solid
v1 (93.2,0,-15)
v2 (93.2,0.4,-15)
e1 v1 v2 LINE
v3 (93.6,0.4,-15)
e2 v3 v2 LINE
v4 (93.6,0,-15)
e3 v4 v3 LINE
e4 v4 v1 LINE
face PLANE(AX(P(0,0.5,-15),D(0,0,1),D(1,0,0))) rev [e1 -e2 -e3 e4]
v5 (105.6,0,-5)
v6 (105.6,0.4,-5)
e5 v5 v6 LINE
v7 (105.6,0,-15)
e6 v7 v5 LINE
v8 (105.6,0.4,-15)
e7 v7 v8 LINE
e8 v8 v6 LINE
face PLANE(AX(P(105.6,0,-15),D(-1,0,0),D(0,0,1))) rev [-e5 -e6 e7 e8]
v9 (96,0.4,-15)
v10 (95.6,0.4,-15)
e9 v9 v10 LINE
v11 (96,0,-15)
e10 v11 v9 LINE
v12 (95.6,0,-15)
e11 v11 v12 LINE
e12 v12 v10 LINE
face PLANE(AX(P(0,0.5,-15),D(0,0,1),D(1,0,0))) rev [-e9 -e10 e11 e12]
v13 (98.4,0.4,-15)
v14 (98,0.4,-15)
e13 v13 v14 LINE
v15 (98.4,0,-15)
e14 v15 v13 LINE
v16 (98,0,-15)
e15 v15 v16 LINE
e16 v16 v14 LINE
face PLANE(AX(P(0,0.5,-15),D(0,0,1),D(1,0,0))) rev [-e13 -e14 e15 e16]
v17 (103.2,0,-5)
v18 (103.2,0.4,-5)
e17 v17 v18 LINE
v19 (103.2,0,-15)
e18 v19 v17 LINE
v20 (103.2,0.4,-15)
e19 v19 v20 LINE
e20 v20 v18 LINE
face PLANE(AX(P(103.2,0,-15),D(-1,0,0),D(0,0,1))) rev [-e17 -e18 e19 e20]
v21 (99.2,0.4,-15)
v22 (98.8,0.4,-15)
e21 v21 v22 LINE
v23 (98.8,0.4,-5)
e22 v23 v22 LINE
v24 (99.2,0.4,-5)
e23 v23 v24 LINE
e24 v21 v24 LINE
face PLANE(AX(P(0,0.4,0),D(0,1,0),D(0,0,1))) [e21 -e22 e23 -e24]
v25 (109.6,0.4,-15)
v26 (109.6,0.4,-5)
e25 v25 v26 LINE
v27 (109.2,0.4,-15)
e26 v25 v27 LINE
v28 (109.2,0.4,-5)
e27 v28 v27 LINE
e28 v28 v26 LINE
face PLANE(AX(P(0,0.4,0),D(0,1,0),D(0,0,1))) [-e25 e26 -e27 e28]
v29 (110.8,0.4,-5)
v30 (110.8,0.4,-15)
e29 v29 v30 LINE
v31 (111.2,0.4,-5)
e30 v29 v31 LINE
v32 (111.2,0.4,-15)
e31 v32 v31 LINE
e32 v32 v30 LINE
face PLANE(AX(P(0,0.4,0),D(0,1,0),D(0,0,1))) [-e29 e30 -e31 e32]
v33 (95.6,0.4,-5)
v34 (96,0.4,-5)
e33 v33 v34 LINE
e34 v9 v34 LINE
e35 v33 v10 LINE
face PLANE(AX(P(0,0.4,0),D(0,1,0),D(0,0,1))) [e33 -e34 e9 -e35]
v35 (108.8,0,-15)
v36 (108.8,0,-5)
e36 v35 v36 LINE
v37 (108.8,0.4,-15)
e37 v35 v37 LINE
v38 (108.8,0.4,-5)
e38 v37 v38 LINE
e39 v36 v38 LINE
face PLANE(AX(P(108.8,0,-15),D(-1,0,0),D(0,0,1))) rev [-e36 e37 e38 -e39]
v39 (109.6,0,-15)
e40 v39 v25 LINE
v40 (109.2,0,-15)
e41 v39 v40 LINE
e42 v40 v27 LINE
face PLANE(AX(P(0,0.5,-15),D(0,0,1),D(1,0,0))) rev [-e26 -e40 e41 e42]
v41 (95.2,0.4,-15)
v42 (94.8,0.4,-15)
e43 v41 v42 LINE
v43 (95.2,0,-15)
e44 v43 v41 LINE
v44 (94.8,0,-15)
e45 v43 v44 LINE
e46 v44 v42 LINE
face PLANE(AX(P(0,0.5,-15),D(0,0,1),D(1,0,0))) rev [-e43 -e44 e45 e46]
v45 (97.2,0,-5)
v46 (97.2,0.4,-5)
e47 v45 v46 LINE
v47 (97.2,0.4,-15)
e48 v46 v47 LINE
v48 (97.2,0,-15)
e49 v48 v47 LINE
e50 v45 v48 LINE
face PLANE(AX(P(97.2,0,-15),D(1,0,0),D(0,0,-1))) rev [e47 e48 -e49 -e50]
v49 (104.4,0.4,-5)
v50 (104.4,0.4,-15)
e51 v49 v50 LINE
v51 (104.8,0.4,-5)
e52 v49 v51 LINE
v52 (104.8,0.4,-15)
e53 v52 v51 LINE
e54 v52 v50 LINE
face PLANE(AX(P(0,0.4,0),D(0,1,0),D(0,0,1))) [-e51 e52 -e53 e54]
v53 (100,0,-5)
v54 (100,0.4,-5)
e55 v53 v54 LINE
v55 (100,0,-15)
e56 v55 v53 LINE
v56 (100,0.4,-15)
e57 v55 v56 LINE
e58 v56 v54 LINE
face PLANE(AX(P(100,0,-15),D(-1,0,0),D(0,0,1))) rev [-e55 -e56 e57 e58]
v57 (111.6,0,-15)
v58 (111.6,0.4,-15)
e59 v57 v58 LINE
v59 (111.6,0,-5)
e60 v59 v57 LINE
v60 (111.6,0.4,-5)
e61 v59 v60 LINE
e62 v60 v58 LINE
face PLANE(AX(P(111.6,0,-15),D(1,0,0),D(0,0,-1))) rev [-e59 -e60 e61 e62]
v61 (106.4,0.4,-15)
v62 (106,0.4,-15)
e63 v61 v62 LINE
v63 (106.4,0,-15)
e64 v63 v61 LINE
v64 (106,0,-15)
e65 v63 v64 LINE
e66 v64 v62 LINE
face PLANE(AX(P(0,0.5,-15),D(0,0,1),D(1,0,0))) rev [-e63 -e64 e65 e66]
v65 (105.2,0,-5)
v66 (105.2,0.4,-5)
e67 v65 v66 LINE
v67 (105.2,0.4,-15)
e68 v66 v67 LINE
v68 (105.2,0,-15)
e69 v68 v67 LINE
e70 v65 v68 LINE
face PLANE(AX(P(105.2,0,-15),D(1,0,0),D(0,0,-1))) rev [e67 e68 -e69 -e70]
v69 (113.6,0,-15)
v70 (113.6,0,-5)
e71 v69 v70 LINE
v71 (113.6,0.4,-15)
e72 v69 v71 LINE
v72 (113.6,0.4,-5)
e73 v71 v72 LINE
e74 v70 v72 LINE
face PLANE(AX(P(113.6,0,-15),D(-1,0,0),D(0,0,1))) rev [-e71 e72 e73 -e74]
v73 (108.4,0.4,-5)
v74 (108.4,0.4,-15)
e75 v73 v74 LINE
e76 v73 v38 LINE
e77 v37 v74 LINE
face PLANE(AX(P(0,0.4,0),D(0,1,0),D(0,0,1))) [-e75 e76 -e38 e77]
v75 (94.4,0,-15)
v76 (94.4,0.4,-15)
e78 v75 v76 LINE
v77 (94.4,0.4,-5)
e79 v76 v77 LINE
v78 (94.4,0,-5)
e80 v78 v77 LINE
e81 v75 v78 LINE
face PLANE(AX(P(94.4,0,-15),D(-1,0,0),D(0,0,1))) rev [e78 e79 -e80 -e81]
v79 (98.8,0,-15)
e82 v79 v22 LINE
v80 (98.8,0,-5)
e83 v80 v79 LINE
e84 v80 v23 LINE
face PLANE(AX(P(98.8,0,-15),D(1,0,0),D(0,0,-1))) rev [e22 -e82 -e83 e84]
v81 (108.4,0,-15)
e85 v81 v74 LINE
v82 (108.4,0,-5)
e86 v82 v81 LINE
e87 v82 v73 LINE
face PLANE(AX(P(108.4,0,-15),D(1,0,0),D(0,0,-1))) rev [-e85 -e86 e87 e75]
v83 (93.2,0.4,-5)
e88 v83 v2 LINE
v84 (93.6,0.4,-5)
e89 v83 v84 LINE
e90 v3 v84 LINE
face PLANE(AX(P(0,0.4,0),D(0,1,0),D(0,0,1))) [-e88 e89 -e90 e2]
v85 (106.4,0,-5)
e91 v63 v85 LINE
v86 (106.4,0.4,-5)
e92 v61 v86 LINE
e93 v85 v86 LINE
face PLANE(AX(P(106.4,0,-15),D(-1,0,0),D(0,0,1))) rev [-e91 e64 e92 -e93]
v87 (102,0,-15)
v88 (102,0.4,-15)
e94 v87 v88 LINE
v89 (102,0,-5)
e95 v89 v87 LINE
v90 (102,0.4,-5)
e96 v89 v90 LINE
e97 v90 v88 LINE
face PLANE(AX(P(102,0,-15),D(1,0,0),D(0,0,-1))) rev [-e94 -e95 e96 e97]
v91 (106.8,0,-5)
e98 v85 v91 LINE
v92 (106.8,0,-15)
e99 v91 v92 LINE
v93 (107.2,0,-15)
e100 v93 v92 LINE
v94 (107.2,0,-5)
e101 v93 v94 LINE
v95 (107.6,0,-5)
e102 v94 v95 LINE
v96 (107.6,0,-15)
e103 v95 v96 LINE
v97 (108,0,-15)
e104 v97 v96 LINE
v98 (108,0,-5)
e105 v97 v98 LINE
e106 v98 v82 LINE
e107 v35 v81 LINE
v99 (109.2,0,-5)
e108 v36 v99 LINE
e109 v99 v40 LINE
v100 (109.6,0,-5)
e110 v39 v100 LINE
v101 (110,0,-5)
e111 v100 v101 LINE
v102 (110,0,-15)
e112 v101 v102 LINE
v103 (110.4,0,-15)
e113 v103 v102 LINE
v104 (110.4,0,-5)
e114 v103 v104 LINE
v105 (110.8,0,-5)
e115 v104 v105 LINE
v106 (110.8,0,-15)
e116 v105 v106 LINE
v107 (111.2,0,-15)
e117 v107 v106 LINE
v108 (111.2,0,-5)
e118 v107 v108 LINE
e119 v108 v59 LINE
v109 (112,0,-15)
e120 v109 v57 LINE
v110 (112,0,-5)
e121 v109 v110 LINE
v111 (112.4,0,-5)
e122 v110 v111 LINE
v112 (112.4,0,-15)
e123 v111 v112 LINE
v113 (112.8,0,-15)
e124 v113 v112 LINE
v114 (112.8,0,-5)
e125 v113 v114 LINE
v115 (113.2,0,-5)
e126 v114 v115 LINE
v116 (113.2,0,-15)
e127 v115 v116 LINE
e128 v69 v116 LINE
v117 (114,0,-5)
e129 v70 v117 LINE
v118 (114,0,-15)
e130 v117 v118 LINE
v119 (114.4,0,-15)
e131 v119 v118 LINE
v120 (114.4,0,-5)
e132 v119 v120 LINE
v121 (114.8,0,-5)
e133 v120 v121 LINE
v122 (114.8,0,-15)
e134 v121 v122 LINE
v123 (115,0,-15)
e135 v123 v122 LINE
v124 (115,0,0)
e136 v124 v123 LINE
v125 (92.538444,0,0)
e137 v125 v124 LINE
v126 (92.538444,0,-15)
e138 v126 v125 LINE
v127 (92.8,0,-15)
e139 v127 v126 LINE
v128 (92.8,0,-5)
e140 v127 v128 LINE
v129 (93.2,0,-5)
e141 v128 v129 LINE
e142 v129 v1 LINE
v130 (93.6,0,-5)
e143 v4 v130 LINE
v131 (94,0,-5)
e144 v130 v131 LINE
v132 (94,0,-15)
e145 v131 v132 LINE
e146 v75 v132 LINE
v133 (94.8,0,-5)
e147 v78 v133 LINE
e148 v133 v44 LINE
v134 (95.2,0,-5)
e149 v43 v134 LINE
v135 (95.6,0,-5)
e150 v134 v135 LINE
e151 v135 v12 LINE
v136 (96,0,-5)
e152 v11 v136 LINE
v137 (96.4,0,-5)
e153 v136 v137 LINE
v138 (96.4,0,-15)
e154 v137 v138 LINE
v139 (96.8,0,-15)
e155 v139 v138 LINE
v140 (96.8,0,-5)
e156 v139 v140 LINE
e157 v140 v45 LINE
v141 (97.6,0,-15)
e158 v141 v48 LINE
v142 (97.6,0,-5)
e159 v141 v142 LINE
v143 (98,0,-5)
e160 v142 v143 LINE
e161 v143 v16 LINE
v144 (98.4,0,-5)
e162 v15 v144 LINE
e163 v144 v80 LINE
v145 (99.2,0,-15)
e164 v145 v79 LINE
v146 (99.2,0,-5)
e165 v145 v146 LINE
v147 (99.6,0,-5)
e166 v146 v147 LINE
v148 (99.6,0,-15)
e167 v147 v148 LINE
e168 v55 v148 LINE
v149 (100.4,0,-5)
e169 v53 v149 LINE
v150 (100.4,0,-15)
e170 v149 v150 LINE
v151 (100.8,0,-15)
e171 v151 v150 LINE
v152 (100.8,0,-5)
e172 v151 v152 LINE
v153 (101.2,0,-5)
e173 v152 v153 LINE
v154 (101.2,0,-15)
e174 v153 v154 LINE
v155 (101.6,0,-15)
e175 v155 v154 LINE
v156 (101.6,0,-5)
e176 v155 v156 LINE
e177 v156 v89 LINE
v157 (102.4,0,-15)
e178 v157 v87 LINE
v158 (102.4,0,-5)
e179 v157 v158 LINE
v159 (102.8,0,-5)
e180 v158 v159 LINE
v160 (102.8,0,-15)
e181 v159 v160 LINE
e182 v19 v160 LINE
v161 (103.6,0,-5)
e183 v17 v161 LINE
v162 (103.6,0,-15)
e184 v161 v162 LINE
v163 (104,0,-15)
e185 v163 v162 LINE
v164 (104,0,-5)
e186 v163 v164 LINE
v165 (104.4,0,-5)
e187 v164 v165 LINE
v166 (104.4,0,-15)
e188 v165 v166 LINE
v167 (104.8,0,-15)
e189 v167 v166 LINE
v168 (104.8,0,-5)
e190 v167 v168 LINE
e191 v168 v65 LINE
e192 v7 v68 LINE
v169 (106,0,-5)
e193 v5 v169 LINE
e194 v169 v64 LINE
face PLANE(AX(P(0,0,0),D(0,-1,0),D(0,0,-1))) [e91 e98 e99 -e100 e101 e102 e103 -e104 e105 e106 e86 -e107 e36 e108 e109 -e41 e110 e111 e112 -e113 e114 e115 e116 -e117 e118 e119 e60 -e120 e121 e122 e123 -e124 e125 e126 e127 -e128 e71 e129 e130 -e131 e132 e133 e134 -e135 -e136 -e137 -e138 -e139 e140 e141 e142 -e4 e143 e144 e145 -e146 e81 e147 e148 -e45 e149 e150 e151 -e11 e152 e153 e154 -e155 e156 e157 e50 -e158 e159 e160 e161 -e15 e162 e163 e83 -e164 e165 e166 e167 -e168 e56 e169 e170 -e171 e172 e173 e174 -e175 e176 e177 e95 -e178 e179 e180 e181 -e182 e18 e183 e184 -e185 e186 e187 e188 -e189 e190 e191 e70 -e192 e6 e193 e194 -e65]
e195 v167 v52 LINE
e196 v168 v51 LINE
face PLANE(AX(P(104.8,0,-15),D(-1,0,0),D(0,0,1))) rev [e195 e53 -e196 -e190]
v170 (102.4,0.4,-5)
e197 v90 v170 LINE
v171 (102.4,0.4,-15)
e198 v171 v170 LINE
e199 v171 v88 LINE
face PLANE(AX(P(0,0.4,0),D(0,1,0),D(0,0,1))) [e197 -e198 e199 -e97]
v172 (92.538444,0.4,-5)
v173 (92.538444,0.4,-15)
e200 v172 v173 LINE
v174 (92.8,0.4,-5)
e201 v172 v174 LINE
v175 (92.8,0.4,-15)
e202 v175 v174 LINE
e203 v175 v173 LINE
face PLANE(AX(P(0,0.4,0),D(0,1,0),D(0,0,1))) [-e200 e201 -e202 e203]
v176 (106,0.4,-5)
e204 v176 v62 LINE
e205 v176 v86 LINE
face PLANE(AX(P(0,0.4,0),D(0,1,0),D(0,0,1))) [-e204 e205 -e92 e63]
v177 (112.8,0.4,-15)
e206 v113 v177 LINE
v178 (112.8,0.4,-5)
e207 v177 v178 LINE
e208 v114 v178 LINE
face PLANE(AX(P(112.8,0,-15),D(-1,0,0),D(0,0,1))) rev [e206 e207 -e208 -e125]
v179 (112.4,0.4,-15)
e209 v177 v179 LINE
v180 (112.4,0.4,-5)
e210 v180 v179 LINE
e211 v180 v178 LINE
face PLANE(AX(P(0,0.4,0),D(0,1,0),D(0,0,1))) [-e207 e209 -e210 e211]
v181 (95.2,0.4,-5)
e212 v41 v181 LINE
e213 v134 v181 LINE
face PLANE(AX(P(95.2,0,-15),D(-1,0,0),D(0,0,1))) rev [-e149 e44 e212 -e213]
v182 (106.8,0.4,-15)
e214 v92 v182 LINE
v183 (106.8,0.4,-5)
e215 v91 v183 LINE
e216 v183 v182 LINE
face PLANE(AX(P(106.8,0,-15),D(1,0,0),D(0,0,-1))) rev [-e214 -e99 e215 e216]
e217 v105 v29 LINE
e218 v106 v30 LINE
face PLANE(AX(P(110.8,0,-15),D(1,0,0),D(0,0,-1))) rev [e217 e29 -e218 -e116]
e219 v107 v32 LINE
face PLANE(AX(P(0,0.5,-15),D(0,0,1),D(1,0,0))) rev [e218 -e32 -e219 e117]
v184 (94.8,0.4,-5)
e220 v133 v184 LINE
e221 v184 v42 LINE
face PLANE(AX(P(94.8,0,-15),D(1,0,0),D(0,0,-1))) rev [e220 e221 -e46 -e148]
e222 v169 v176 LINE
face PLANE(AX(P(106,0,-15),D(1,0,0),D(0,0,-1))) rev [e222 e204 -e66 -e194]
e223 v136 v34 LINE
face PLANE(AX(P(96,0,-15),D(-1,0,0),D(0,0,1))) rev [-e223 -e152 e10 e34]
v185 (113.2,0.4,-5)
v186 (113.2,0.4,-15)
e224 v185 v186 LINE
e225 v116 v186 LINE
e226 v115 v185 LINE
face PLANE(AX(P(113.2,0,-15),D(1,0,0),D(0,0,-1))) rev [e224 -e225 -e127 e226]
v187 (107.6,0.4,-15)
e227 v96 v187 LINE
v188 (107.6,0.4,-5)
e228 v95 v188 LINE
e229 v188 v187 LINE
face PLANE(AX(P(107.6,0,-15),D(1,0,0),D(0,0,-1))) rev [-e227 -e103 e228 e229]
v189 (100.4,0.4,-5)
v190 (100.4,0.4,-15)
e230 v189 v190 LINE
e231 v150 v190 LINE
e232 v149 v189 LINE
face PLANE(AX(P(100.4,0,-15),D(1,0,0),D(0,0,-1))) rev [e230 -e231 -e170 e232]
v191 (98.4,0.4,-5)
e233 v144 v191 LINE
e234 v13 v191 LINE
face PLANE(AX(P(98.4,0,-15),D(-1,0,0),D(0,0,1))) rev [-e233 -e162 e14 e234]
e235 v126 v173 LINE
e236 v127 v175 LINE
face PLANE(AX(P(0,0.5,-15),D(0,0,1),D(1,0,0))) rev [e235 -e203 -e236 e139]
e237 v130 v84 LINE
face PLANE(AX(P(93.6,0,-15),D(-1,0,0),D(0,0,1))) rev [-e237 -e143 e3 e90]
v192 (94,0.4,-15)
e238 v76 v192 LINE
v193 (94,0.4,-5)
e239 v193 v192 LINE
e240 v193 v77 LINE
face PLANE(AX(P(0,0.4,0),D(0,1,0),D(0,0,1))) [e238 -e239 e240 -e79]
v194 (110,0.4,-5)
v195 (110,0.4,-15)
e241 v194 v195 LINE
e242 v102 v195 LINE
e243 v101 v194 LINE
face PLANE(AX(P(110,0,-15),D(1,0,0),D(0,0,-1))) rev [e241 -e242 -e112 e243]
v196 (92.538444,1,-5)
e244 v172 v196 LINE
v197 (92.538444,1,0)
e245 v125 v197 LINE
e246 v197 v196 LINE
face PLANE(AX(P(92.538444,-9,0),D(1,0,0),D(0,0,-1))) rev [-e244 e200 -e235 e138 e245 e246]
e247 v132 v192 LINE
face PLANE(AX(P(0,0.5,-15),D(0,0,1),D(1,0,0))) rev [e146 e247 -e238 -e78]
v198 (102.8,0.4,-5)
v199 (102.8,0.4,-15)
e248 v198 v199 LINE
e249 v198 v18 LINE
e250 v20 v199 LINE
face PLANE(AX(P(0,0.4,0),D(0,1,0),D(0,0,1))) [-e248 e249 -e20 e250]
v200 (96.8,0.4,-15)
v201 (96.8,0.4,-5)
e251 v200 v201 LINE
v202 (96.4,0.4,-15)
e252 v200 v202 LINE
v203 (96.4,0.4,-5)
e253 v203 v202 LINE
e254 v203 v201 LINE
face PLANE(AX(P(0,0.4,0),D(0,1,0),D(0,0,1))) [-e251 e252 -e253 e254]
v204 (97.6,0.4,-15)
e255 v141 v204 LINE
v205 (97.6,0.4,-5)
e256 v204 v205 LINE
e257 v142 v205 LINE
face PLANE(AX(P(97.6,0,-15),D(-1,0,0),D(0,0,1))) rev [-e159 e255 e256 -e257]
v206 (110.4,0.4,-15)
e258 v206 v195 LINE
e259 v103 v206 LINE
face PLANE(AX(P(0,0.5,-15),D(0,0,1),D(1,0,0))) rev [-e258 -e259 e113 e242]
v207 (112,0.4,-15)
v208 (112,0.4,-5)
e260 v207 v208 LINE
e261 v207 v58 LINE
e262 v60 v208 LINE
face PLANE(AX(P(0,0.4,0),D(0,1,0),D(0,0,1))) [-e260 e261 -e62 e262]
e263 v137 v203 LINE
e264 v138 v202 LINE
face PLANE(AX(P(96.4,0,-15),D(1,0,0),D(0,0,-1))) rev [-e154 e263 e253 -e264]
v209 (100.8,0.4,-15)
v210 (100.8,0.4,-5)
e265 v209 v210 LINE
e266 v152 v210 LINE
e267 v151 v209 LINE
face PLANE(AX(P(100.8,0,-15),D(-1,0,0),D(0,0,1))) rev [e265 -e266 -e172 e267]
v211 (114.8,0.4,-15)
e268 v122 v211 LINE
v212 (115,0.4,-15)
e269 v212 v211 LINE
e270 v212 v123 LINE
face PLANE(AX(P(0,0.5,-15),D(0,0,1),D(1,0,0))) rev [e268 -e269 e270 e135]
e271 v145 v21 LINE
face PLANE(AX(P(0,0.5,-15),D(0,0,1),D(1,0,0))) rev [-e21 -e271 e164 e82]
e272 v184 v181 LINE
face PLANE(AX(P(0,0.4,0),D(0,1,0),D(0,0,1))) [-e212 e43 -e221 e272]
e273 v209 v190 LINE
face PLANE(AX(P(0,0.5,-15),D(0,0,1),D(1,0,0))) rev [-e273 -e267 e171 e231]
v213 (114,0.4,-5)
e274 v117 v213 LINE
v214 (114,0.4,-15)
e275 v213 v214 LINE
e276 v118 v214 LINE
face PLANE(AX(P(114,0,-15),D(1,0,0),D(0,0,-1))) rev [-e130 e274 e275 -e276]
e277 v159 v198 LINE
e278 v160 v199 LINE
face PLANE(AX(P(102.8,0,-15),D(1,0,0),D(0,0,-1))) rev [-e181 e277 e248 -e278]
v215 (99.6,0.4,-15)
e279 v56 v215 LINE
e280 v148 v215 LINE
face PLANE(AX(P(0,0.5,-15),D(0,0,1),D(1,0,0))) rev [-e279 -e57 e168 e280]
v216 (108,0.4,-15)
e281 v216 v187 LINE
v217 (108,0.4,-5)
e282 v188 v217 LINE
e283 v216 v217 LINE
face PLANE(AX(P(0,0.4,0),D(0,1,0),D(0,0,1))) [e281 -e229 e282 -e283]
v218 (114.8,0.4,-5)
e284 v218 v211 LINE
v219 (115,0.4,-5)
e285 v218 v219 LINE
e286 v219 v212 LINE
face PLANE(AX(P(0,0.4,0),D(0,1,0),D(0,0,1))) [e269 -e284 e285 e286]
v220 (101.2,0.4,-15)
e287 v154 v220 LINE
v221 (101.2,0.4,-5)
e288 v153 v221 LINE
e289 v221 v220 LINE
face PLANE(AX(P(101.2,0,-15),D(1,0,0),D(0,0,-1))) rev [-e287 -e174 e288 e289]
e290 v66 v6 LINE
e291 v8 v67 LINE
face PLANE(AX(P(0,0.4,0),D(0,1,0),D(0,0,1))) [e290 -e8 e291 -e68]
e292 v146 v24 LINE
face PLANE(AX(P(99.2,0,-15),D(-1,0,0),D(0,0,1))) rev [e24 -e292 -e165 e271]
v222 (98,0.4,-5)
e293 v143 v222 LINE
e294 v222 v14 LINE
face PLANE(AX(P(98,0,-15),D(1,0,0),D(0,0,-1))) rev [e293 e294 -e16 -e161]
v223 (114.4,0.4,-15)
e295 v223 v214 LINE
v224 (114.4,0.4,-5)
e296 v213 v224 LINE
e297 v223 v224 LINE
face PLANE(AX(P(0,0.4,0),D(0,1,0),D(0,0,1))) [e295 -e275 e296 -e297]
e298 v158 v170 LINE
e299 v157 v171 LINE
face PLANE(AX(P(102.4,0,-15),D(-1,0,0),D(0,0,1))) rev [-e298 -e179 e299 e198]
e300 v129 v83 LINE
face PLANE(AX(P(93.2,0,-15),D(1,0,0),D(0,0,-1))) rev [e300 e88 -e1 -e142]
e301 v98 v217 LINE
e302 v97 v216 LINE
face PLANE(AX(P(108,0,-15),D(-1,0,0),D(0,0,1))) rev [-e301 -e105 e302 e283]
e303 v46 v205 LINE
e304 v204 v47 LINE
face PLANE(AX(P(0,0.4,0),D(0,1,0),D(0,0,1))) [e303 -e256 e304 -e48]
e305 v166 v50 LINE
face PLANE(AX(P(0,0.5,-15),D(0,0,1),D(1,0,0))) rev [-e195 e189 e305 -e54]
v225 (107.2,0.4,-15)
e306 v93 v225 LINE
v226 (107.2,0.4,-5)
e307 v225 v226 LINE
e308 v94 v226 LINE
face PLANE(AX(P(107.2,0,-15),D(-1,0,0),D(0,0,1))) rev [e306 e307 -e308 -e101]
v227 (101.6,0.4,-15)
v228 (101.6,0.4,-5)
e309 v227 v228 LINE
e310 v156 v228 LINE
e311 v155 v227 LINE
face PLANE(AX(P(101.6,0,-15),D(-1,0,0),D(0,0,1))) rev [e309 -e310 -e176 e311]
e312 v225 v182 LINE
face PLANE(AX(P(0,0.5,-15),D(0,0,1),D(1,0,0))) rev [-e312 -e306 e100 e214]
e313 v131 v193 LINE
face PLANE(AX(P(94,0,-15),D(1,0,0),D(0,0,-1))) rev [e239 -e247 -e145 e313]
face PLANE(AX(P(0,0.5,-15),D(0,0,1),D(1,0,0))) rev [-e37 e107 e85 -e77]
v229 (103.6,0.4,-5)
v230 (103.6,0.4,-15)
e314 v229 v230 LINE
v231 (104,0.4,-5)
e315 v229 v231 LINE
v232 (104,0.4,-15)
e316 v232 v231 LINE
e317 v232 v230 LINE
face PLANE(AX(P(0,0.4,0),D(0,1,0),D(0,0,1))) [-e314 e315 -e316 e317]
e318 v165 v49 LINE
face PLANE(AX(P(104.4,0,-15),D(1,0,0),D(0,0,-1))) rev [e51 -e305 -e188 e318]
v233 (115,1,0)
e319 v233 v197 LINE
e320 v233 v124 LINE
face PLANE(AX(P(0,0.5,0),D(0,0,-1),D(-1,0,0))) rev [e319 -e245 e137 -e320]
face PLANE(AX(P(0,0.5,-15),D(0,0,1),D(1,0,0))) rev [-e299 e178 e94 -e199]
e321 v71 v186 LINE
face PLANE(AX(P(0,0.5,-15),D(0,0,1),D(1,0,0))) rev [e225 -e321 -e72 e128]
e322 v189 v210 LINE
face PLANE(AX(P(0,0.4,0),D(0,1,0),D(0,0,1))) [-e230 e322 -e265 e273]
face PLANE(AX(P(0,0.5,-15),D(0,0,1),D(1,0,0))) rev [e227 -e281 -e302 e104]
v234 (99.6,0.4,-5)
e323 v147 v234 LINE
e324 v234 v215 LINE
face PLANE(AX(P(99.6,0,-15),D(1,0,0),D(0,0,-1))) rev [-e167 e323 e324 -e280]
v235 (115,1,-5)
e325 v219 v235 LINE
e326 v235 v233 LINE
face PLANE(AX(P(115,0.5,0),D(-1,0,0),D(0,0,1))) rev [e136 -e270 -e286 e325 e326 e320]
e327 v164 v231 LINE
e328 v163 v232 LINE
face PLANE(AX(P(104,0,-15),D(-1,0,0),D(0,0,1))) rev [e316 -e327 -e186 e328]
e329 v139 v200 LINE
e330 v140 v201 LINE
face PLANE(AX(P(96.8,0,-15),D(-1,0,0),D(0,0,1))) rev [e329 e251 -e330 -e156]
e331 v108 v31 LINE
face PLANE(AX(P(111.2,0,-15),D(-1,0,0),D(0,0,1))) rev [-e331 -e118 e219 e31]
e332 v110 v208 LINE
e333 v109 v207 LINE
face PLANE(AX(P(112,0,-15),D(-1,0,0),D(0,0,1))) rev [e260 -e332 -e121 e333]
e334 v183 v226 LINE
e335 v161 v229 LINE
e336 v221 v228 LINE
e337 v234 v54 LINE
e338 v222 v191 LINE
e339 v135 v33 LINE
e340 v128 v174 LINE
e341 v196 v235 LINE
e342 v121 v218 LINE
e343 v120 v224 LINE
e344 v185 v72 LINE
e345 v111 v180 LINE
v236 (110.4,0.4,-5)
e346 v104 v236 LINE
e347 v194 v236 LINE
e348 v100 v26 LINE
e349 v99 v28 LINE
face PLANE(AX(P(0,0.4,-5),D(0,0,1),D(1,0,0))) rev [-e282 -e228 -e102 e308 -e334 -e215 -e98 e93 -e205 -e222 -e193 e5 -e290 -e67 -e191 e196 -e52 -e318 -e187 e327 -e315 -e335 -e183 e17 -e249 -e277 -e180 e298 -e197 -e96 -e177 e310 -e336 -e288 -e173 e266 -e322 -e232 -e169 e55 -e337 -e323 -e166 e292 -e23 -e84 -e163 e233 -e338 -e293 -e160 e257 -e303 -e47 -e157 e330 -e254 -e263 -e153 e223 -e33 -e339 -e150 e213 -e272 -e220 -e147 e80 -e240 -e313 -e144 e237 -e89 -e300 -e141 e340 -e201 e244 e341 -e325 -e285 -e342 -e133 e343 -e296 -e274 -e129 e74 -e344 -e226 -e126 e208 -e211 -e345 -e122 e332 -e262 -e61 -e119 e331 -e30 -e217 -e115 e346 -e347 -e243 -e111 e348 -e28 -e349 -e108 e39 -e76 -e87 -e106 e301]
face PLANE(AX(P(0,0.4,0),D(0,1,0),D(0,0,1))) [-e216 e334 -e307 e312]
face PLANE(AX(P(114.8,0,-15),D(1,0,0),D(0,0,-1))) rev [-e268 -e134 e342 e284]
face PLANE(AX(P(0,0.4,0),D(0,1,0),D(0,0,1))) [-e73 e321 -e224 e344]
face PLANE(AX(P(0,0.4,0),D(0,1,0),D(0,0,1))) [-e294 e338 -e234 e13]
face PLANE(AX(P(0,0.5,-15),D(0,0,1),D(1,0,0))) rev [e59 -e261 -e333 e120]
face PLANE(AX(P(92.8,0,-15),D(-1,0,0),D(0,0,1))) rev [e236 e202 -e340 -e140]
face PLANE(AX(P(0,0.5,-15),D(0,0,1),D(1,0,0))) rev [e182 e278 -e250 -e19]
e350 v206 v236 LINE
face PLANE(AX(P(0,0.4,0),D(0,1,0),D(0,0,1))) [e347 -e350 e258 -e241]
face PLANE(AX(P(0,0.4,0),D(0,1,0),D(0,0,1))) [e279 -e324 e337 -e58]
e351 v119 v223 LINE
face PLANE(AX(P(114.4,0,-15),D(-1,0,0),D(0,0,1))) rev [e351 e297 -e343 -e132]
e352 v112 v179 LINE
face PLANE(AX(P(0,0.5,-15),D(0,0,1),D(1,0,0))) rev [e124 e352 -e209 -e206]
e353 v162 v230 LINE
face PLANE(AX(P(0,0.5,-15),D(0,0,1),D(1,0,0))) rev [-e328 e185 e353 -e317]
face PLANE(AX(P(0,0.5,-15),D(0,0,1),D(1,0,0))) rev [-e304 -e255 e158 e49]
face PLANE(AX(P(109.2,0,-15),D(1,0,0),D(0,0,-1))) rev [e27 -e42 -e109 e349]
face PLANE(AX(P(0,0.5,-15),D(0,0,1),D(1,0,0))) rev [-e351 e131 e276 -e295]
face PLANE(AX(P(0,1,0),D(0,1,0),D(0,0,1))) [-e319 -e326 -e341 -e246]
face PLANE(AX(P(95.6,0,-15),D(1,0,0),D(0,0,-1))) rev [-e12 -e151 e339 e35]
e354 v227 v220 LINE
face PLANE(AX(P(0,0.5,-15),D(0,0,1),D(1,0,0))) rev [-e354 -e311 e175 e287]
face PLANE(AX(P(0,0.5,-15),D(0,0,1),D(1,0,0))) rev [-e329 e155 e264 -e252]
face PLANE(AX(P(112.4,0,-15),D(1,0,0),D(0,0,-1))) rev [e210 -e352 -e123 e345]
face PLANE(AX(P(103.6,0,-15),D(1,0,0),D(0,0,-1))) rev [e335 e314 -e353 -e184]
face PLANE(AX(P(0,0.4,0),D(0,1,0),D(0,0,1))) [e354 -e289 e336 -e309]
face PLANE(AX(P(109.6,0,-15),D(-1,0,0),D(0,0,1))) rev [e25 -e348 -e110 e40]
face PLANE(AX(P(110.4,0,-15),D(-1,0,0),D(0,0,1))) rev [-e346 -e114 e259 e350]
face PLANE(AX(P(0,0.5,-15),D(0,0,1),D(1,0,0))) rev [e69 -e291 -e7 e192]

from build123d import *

# Parameters (mm, degrees)
SKETCH1_W           = 115
SKETCH1_H           = 15
BOSS_EXTRUDE1_DEPTH = 0.5
SKETCH2_W           = 115
SKETCH2_H           = 10
CUT_EXTRUDE1_DEPTH  = 0.1
SKETCH3_W           = 0.4
SKETCH3_H           = 10
CUT_EXTRUDE2_DEPTH  = 0.4
LPATTERN3_COUNT     = 150
LPATTERN3_PITCH     = 0.8
SKETCH4_W           = 115
SKETCH4_H           = 5
BOSS_EXTRUDE2_DEPTH = 1
SKETCH5_W           = 77.289086501
SKETCH5_H           = 15.822063322
CUT_EXTRUDE3_DEPTH  = 1
SKETCH6_W           = 3.197112069
SKETCH6_H           = 15.066627115
CUT_EXTRUDE4_DEPTH  = 1
SKETCH7_W           = 12.052245582
SKETCH7_H           = 15.126214191
CUT_EXTRUDE5_DEPTH  = 10


with BuildPart() as part:
    # Sketch1 → Boss-Extrude1 (new body)
    with BuildSketch(Plane(origin=(0, 0, 0), x_dir=(1, 0, 0), z_dir=(0, 1, 0))):
        with Locations((57.5, 7.5)):
            Rectangle(SKETCH1_W, SKETCH1_H)
    extrude(amount=BOSS_EXTRUDE1_DEPTH)

    # Sketch2 → Cut-Extrude1 (cut)
    with BuildSketch(Plane(origin=(0, 0.5, 0), x_dir=(1, 0, 0), z_dir=(0, 1, 0))):
        with Locations((57.5, 10)):
            Rectangle(SKETCH2_W, SKETCH2_H)
    extrude(amount=-CUT_EXTRUDE1_DEPTH, mode=Mode.SUBTRACT)

    # Sketch3 → Cut-Extrude2 (cut)
    with BuildSketch(Plane(origin=(0, 0.4, 0), x_dir=(1, 0, 0), z_dir=(0, 1, 0))):
        with Locations((0.2, 10)):
            Rectangle(SKETCH3_W, SKETCH3_H)
    cut_extrude2 = extrude(amount=-CUT_EXTRUDE2_DEPTH, mode=Mode.SUBTRACT)

    # LPattern3: Cut-Extrude2 ×150
    with Locations(*[(i * LPATTERN3_PITCH, 0, 0) for i in range(1, LPATTERN3_COUNT)]):
        add(cut_extrude2, mode=Mode.SUBTRACT)

    # Sketch4 → Boss-Extrude2 (add)
    with BuildSketch(Plane.XZ):
        with Locations((57.5, -2.5)):
            Rectangle(SKETCH4_W, SKETCH4_H)
    extrude(amount=-BOSS_EXTRUDE2_DEPTH)

    # Sketch5 → Cut-Extrude3 (cut)
    with BuildSketch(Plane(origin=(0, 1, 0), x_dir=(1, 0, 0), z_dir=(0, 1, 0))):
        with Locations((38.64454325, 7.911031661)):
            Rectangle(SKETCH5_W, SKETCH5_H)
    extrude(amount=-CUT_EXTRUDE3_DEPTH, mode=Mode.SUBTRACT)

    # Sketch6 → Cut-Extrude4 (cut)
    with BuildSketch(Plane(origin=(0, 1, 0), x_dir=(1, 0, 0), z_dir=(0, 1, 0))):
        with Locations((78.887642535, 7.533313558)):
            Rectangle(SKETCH6_W, SKETCH6_H)
    extrude(amount=-CUT_EXTRUDE4_DEPTH, mode=Mode.SUBTRACT)

    # Sketch7 → Cut-Extrude5 (cut)
    with BuildSketch(Plane(origin=(0, 1, 0), x_dir=(1, 0, 0), z_dir=(0, 1, 0))):
        with Locations((86.512321361, 7.563107096)):
            Rectangle(SKETCH7_W, SKETCH7_H)
    extrude(amount=-CUT_EXTRUDE5_DEPTH, mode=Mode.SUBTRACT)


solid = part.part
